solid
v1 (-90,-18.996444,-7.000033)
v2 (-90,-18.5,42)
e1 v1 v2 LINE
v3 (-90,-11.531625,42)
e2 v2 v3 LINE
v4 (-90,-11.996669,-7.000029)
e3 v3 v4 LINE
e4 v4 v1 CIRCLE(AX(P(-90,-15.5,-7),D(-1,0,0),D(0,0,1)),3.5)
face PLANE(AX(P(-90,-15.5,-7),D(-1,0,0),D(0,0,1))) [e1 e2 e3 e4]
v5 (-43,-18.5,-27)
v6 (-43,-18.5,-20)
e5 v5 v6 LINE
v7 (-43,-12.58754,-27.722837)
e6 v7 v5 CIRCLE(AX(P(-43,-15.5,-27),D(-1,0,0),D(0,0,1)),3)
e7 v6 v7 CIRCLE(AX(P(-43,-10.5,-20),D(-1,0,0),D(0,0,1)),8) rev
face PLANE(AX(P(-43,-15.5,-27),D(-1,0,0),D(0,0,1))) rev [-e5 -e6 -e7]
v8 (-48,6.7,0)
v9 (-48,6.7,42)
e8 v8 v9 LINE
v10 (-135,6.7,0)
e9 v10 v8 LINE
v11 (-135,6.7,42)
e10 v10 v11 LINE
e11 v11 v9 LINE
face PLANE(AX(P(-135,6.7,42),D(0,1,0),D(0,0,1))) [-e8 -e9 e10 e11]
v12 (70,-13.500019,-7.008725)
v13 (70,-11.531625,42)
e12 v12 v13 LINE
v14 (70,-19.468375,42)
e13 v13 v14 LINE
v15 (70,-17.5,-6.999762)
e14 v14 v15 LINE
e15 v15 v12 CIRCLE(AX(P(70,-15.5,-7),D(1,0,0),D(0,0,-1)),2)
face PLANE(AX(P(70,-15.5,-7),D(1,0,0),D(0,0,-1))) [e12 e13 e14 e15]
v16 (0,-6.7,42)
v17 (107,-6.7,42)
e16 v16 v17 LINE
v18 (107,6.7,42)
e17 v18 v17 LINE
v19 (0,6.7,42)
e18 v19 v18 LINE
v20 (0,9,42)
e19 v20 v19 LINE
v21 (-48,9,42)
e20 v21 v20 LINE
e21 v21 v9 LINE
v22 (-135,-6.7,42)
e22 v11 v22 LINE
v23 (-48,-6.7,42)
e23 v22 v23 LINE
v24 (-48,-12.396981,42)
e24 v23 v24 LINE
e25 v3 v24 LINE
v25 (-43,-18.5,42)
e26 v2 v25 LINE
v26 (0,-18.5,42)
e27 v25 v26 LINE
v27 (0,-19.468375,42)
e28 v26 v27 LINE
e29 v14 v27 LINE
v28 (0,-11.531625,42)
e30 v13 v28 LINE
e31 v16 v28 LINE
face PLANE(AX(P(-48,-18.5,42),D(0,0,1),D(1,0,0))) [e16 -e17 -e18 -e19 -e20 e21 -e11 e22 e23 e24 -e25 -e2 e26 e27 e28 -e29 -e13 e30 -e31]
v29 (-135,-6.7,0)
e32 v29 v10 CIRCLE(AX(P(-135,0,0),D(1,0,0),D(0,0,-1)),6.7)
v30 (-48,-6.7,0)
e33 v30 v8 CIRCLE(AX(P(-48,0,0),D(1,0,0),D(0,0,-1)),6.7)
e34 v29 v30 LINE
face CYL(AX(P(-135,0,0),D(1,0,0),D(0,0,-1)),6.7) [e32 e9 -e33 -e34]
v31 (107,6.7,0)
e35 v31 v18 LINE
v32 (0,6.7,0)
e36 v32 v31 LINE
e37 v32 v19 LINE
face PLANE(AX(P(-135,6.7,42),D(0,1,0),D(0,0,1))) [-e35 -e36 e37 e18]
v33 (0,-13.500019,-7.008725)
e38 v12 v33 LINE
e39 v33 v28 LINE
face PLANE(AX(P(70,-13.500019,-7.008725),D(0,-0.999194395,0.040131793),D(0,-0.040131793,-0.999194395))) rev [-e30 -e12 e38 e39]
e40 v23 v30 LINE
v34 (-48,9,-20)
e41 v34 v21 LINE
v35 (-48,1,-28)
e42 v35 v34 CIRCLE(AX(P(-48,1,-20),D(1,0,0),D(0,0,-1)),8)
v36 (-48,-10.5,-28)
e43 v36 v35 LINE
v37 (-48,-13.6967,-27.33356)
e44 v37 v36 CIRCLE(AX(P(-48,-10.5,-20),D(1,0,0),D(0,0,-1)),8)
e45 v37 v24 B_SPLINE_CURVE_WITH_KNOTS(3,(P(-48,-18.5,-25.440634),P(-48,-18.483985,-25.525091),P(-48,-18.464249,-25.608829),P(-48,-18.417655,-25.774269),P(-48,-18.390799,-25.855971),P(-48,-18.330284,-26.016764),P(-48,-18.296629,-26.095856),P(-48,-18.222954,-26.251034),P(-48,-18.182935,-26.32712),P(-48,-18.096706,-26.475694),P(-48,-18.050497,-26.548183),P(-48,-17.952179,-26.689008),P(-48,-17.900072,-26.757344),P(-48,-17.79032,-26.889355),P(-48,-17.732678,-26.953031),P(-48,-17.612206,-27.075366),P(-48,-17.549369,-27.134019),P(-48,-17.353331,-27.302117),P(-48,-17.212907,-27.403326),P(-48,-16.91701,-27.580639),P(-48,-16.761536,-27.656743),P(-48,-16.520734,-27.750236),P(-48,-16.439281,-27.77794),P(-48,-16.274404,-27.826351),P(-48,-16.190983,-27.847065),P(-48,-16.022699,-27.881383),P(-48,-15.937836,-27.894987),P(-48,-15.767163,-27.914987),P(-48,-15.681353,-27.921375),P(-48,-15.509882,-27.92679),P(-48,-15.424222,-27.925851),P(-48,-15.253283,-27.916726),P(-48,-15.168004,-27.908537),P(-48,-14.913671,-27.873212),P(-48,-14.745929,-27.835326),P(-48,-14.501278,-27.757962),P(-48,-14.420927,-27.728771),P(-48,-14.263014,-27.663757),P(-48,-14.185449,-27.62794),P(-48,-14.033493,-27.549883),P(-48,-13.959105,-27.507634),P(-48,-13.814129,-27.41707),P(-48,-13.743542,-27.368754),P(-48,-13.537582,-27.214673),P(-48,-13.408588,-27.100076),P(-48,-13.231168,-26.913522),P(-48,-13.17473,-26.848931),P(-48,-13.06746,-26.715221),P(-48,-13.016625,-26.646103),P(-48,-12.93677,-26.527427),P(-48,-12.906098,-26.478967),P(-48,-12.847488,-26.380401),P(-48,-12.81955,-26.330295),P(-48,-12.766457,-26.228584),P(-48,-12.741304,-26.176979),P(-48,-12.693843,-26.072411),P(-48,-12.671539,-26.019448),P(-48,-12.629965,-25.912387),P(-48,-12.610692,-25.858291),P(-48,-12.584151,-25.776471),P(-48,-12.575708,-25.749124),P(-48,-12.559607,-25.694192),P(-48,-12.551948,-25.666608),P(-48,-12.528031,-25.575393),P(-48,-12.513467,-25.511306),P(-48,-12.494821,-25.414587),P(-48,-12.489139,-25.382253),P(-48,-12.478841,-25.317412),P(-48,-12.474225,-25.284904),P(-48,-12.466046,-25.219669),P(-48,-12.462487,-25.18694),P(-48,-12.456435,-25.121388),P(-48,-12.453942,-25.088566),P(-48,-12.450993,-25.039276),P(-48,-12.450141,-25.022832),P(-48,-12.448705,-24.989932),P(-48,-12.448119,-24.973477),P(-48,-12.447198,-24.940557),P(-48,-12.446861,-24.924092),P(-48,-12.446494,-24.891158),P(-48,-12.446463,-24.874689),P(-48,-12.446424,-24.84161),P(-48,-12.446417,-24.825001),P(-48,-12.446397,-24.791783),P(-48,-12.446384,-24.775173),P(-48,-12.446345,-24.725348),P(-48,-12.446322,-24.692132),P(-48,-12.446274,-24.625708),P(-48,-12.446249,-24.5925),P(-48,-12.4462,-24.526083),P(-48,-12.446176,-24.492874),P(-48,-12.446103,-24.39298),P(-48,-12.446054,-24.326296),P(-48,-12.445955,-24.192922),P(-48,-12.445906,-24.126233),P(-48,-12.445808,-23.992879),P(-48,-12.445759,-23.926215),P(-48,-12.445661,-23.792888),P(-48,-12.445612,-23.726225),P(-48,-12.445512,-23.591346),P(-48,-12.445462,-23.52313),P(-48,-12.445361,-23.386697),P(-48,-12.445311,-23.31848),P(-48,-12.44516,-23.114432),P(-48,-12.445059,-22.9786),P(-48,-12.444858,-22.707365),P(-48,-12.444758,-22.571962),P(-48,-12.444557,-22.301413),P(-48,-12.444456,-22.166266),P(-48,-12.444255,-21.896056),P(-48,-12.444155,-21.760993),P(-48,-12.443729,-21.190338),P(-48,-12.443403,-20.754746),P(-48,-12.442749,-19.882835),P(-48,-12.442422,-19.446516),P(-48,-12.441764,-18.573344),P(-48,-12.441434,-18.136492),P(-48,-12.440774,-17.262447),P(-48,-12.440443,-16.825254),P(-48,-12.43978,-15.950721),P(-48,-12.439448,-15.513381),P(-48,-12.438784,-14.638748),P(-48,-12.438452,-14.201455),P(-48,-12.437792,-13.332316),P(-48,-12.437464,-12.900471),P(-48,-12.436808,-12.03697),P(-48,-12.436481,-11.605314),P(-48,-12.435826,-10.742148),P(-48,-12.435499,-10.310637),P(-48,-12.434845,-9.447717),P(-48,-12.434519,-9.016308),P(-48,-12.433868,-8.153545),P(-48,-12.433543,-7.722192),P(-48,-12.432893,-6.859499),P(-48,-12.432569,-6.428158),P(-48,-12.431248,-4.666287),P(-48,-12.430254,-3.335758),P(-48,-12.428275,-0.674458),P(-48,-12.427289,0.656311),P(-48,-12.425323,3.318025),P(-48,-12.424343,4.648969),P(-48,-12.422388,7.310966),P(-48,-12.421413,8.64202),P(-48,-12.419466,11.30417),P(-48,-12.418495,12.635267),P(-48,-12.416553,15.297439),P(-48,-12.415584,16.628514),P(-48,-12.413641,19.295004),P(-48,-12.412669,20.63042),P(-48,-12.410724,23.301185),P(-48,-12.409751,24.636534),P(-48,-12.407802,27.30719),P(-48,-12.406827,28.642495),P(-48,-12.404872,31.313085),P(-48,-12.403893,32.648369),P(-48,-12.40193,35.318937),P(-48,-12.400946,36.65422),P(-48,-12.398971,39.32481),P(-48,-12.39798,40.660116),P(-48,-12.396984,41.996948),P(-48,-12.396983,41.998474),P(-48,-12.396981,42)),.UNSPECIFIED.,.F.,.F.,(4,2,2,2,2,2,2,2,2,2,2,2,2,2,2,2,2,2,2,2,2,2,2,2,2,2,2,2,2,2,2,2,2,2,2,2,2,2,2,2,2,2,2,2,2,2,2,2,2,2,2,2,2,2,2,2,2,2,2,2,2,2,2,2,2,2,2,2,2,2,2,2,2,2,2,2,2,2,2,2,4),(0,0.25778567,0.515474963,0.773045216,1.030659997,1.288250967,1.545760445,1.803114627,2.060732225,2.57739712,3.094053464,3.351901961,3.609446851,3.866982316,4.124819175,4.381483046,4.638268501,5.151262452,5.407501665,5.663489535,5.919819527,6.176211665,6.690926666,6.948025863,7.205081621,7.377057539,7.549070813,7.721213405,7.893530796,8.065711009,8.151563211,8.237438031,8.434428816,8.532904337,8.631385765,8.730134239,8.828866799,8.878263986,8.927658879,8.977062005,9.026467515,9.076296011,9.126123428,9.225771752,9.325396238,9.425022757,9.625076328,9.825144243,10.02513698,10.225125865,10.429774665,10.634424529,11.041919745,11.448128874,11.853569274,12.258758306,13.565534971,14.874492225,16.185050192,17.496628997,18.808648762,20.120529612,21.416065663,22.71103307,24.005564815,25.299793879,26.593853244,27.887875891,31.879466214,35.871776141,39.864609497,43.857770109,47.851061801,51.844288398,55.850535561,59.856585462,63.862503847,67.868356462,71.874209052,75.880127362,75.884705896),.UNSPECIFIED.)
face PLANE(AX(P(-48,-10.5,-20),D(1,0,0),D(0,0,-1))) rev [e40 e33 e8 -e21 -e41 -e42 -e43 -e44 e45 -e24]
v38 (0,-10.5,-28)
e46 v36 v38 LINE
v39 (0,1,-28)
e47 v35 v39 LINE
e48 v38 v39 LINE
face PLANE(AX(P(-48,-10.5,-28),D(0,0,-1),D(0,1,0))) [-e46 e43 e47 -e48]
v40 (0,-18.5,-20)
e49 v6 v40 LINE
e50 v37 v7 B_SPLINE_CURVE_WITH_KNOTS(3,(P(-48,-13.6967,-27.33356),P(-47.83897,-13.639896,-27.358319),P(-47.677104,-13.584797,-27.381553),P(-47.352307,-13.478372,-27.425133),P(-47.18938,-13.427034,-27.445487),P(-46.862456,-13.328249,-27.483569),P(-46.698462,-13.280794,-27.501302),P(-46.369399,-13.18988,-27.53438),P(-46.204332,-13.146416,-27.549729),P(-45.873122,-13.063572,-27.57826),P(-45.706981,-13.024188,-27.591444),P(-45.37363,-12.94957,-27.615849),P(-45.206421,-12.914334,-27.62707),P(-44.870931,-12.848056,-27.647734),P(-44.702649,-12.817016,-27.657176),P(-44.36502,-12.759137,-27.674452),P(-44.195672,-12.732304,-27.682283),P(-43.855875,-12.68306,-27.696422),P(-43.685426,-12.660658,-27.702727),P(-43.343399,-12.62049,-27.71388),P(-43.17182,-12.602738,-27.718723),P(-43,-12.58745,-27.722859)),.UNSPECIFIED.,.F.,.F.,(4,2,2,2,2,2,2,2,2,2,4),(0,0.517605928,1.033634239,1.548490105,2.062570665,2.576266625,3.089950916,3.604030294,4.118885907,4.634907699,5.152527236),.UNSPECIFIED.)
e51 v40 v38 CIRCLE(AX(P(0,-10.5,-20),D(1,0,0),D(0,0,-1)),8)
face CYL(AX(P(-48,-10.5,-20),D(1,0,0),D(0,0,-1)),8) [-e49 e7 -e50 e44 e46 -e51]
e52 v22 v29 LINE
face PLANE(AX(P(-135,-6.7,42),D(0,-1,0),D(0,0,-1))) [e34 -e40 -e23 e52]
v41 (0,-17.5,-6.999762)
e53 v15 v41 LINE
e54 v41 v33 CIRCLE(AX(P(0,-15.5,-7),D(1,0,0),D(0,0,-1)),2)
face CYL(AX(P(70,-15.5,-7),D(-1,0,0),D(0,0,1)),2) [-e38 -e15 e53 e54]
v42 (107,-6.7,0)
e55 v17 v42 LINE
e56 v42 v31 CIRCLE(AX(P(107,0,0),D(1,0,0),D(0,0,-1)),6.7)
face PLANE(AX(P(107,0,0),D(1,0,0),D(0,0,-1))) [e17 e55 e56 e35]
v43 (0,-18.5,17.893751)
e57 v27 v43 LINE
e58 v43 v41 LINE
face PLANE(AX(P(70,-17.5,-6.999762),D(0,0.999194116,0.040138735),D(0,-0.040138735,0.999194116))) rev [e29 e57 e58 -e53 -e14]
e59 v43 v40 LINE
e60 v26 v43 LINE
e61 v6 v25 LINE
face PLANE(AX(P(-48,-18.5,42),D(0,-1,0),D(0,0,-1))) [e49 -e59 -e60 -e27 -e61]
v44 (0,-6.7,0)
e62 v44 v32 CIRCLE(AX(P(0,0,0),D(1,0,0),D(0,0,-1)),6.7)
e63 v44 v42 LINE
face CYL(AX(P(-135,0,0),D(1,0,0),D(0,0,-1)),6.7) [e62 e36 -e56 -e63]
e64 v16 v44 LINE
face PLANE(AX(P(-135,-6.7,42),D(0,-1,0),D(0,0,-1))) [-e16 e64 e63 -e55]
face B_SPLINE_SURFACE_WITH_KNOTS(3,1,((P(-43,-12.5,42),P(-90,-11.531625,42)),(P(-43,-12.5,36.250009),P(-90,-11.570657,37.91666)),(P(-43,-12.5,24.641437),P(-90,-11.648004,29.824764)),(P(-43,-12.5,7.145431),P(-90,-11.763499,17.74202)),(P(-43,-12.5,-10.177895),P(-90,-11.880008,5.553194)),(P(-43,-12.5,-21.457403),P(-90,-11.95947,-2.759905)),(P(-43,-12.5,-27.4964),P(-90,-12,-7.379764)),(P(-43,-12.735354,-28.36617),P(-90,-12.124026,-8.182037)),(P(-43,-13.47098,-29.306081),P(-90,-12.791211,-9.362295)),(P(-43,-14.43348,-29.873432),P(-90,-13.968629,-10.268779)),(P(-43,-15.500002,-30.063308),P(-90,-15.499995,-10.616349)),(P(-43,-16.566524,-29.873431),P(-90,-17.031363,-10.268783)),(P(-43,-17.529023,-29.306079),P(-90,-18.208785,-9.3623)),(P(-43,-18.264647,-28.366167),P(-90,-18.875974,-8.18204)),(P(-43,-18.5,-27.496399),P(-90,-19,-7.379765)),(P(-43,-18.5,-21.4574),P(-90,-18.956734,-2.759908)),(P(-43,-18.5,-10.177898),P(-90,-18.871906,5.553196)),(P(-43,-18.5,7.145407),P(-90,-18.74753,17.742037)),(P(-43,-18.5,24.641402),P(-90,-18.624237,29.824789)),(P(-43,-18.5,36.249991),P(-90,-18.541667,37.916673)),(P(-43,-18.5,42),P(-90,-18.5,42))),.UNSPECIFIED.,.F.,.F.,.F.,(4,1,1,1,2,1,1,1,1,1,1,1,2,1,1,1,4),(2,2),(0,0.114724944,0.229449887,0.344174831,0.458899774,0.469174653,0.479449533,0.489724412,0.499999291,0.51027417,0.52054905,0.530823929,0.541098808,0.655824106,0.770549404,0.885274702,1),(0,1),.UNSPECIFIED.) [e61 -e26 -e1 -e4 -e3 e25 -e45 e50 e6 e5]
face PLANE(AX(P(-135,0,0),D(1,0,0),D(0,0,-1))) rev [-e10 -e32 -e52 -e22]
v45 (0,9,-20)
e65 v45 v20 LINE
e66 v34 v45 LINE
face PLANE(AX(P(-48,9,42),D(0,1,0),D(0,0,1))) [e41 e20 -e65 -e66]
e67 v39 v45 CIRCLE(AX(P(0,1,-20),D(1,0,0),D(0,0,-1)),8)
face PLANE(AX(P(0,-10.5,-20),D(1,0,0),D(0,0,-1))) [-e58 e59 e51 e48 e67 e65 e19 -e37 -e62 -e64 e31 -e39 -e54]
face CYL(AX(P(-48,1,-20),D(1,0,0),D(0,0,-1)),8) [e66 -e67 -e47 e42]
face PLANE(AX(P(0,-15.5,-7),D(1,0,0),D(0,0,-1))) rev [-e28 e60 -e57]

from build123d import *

# Parameters (mm, degrees)
BOSS_EXTRUDE1_DEPTH      = 48
BOSS_EXTRUDE2_DEPTH      = 107
BOSS_EXTRUDE2_DEPTH_BACK = 135
BOSS_EXTRUDE3_DEPTH      = 70


with BuildPart() as part:
    # Sketch6 → Boss-Extrude1 (new body)
    with BuildSketch(Plane.YZ):
        with BuildLine():
            Line((-18.5, 42), (9, 42))
            Line((9, 42), (9, -20))
            ThreePointArc((9, -20), (6.656854249, -25.656854249), (1, -28))
            Line((1, -28), (-10.5, -28))
            ThreePointArc((-10.5, -28), (-16.156854249, -25.656854249), (-18.5, -20))
            Line((-18.5, -20), (-18.5, 42))
        make_face()
    extrude(amount=-BOSS_EXTRUDE1_DEPTH)

    # Sketch7 → Boss-Extrude2 (add, two sides: drawn at the far end of the back side and taken through both)
    with BuildSketch(Plane.YZ.offset(-BOSS_EXTRUDE2_DEPTH_BACK)):
        with BuildLine():
            Line((6.7, 42), (6.7, 0))
            ThreePointArc((6.7, 0), (0, -6.7), (-6.7, 0))
            Line((-6.7, 0), (-6.7, 42))
            Line((-6.7, 42), (6.7, 42))
        make_face()
    extrude(amount=BOSS_EXTRUDE2_DEPTH + BOSS_EXTRUDE2_DEPTH_BACK)

    # Sketch8 → Boss-Extrude3 (add)
    with BuildSketch(Plane.YZ):
        with BuildLine():
            Line((-17.499999986, -6.99976205), (-19.468374717, 42))
            Line((-19.468374717, 42), (-11.531625283, 42))
            Line((-11.531625283, 42), (-13.500019034, -7.008725467))
            ThreePointArc((-13.500019034, -7.008725467), (-15.504481719, -8.999994979), (-17.499999986, -6.99976205))
        make_face()
    extrude(amount=BOSS_EXTRUDE3_DEPTH)

    # Loft2: read off the stored shape, not the designer's step
    # Loft2: loft between two sections, ruled curve by curve
    loft2_from = [
        Edge.make_bspline([(-43, -12.5, 42), (-43, -12.5, 36.250008881), (-43, -12.5, 24.641436529), (-43, -12.5, 7.145431099), (-43, -12.5, -10.177895331), (-43, -12.5, -21.457402798), (-43, -12.5, -27.496400477), (-43, -12.735353866, -28.366169962), (-43, -13.470979996, -29.306081404), (-43, -14.433479869, -29.873432167), (-43, -15.500002282, -30.063307511), (-43, -16.566524261, -29.873430596), (-43, -17.529022849, -29.306078761), (-43, -18.264647219, -28.36616736), (-43, -18.5, -27.496399176), (-43, -18.5, -21.457400197), (-43, -18.5, -10.177897954), (-43, -18.5, 7.145406937), (-43, -18.5, 24.641401673), (-43, -18.5, 36.249991119), (-43, -18.5, 42)], [0, 0, 0, 0, 0.114724944, 0.229449887, 0.344174831, 0.458899774, 0.458899774, 0.469174653, 0.479449533, 0.489724412, 0.499999291, 0.51027417, 0.52054905, 0.530823929, 0.541098808, 0.541098808, 0.655824106, 0.770549404, 0.885274702, 1, 1, 1, 1], 3),
        Edge.make_line((-43, -18.5, 42), (-43, -12.5, 42)),
    ]
    loft2_to = [
        Edge.make_bspline([(-90, -11.531625283, 42), (-90, -11.570656574, 37.916659954), (-90, -11.648004314, 29.824764413), (-90, -11.763499254, 17.742019914), (-90, -11.880008186, 5.553194479), (-90, -11.95947034, -2.759904881), (-90, -12, -7.379764452), (-90, -12.124025603, -8.182036975), (-90, -12.791211148, -9.362294599), (-90, -13.96862904, -10.268779081), (-90, -15.499994859, -10.616349391), (-90, -17.031362783, -10.268783245), (-90, -18.208784945, -9.362299724), (-90, -18.87597374, -8.182040057), (-90, -19, -7.379765435), (-90, -18.956733754, -2.759907847), (-90, -18.871906161, 5.553196207), (-90, -18.747530231, 17.742037363), (-90, -18.624236843, 29.824789377), (-90, -18.541666598, 37.916673379), (-90, -18.5, 42)], [0, 0, 0, 0, 0.114724944, 0.229449887, 0.344174831, 0.458899774, 0.458899774, 0.469174653, 0.479449533, 0.489724412, 0.499999291, 0.51027417, 0.52054905, 0.530823929, 0.541098808, 0.541098808, 0.655824106, 0.770549404, 0.885274702, 1, 1, 1, 1], 3),
        Edge.make_line((-90, -18.5, 42), (-90, -11.531625283, 42)),
    ]
    loft2 = Solid(Shell([*[Face.make_surface_from_curves(loft2_from[k], loft2_to[k]) for k in range(2)], Face(Wire(loft2_from)), Face(Wire(loft2_to))]))
    add(loft2)


solid = part.part
